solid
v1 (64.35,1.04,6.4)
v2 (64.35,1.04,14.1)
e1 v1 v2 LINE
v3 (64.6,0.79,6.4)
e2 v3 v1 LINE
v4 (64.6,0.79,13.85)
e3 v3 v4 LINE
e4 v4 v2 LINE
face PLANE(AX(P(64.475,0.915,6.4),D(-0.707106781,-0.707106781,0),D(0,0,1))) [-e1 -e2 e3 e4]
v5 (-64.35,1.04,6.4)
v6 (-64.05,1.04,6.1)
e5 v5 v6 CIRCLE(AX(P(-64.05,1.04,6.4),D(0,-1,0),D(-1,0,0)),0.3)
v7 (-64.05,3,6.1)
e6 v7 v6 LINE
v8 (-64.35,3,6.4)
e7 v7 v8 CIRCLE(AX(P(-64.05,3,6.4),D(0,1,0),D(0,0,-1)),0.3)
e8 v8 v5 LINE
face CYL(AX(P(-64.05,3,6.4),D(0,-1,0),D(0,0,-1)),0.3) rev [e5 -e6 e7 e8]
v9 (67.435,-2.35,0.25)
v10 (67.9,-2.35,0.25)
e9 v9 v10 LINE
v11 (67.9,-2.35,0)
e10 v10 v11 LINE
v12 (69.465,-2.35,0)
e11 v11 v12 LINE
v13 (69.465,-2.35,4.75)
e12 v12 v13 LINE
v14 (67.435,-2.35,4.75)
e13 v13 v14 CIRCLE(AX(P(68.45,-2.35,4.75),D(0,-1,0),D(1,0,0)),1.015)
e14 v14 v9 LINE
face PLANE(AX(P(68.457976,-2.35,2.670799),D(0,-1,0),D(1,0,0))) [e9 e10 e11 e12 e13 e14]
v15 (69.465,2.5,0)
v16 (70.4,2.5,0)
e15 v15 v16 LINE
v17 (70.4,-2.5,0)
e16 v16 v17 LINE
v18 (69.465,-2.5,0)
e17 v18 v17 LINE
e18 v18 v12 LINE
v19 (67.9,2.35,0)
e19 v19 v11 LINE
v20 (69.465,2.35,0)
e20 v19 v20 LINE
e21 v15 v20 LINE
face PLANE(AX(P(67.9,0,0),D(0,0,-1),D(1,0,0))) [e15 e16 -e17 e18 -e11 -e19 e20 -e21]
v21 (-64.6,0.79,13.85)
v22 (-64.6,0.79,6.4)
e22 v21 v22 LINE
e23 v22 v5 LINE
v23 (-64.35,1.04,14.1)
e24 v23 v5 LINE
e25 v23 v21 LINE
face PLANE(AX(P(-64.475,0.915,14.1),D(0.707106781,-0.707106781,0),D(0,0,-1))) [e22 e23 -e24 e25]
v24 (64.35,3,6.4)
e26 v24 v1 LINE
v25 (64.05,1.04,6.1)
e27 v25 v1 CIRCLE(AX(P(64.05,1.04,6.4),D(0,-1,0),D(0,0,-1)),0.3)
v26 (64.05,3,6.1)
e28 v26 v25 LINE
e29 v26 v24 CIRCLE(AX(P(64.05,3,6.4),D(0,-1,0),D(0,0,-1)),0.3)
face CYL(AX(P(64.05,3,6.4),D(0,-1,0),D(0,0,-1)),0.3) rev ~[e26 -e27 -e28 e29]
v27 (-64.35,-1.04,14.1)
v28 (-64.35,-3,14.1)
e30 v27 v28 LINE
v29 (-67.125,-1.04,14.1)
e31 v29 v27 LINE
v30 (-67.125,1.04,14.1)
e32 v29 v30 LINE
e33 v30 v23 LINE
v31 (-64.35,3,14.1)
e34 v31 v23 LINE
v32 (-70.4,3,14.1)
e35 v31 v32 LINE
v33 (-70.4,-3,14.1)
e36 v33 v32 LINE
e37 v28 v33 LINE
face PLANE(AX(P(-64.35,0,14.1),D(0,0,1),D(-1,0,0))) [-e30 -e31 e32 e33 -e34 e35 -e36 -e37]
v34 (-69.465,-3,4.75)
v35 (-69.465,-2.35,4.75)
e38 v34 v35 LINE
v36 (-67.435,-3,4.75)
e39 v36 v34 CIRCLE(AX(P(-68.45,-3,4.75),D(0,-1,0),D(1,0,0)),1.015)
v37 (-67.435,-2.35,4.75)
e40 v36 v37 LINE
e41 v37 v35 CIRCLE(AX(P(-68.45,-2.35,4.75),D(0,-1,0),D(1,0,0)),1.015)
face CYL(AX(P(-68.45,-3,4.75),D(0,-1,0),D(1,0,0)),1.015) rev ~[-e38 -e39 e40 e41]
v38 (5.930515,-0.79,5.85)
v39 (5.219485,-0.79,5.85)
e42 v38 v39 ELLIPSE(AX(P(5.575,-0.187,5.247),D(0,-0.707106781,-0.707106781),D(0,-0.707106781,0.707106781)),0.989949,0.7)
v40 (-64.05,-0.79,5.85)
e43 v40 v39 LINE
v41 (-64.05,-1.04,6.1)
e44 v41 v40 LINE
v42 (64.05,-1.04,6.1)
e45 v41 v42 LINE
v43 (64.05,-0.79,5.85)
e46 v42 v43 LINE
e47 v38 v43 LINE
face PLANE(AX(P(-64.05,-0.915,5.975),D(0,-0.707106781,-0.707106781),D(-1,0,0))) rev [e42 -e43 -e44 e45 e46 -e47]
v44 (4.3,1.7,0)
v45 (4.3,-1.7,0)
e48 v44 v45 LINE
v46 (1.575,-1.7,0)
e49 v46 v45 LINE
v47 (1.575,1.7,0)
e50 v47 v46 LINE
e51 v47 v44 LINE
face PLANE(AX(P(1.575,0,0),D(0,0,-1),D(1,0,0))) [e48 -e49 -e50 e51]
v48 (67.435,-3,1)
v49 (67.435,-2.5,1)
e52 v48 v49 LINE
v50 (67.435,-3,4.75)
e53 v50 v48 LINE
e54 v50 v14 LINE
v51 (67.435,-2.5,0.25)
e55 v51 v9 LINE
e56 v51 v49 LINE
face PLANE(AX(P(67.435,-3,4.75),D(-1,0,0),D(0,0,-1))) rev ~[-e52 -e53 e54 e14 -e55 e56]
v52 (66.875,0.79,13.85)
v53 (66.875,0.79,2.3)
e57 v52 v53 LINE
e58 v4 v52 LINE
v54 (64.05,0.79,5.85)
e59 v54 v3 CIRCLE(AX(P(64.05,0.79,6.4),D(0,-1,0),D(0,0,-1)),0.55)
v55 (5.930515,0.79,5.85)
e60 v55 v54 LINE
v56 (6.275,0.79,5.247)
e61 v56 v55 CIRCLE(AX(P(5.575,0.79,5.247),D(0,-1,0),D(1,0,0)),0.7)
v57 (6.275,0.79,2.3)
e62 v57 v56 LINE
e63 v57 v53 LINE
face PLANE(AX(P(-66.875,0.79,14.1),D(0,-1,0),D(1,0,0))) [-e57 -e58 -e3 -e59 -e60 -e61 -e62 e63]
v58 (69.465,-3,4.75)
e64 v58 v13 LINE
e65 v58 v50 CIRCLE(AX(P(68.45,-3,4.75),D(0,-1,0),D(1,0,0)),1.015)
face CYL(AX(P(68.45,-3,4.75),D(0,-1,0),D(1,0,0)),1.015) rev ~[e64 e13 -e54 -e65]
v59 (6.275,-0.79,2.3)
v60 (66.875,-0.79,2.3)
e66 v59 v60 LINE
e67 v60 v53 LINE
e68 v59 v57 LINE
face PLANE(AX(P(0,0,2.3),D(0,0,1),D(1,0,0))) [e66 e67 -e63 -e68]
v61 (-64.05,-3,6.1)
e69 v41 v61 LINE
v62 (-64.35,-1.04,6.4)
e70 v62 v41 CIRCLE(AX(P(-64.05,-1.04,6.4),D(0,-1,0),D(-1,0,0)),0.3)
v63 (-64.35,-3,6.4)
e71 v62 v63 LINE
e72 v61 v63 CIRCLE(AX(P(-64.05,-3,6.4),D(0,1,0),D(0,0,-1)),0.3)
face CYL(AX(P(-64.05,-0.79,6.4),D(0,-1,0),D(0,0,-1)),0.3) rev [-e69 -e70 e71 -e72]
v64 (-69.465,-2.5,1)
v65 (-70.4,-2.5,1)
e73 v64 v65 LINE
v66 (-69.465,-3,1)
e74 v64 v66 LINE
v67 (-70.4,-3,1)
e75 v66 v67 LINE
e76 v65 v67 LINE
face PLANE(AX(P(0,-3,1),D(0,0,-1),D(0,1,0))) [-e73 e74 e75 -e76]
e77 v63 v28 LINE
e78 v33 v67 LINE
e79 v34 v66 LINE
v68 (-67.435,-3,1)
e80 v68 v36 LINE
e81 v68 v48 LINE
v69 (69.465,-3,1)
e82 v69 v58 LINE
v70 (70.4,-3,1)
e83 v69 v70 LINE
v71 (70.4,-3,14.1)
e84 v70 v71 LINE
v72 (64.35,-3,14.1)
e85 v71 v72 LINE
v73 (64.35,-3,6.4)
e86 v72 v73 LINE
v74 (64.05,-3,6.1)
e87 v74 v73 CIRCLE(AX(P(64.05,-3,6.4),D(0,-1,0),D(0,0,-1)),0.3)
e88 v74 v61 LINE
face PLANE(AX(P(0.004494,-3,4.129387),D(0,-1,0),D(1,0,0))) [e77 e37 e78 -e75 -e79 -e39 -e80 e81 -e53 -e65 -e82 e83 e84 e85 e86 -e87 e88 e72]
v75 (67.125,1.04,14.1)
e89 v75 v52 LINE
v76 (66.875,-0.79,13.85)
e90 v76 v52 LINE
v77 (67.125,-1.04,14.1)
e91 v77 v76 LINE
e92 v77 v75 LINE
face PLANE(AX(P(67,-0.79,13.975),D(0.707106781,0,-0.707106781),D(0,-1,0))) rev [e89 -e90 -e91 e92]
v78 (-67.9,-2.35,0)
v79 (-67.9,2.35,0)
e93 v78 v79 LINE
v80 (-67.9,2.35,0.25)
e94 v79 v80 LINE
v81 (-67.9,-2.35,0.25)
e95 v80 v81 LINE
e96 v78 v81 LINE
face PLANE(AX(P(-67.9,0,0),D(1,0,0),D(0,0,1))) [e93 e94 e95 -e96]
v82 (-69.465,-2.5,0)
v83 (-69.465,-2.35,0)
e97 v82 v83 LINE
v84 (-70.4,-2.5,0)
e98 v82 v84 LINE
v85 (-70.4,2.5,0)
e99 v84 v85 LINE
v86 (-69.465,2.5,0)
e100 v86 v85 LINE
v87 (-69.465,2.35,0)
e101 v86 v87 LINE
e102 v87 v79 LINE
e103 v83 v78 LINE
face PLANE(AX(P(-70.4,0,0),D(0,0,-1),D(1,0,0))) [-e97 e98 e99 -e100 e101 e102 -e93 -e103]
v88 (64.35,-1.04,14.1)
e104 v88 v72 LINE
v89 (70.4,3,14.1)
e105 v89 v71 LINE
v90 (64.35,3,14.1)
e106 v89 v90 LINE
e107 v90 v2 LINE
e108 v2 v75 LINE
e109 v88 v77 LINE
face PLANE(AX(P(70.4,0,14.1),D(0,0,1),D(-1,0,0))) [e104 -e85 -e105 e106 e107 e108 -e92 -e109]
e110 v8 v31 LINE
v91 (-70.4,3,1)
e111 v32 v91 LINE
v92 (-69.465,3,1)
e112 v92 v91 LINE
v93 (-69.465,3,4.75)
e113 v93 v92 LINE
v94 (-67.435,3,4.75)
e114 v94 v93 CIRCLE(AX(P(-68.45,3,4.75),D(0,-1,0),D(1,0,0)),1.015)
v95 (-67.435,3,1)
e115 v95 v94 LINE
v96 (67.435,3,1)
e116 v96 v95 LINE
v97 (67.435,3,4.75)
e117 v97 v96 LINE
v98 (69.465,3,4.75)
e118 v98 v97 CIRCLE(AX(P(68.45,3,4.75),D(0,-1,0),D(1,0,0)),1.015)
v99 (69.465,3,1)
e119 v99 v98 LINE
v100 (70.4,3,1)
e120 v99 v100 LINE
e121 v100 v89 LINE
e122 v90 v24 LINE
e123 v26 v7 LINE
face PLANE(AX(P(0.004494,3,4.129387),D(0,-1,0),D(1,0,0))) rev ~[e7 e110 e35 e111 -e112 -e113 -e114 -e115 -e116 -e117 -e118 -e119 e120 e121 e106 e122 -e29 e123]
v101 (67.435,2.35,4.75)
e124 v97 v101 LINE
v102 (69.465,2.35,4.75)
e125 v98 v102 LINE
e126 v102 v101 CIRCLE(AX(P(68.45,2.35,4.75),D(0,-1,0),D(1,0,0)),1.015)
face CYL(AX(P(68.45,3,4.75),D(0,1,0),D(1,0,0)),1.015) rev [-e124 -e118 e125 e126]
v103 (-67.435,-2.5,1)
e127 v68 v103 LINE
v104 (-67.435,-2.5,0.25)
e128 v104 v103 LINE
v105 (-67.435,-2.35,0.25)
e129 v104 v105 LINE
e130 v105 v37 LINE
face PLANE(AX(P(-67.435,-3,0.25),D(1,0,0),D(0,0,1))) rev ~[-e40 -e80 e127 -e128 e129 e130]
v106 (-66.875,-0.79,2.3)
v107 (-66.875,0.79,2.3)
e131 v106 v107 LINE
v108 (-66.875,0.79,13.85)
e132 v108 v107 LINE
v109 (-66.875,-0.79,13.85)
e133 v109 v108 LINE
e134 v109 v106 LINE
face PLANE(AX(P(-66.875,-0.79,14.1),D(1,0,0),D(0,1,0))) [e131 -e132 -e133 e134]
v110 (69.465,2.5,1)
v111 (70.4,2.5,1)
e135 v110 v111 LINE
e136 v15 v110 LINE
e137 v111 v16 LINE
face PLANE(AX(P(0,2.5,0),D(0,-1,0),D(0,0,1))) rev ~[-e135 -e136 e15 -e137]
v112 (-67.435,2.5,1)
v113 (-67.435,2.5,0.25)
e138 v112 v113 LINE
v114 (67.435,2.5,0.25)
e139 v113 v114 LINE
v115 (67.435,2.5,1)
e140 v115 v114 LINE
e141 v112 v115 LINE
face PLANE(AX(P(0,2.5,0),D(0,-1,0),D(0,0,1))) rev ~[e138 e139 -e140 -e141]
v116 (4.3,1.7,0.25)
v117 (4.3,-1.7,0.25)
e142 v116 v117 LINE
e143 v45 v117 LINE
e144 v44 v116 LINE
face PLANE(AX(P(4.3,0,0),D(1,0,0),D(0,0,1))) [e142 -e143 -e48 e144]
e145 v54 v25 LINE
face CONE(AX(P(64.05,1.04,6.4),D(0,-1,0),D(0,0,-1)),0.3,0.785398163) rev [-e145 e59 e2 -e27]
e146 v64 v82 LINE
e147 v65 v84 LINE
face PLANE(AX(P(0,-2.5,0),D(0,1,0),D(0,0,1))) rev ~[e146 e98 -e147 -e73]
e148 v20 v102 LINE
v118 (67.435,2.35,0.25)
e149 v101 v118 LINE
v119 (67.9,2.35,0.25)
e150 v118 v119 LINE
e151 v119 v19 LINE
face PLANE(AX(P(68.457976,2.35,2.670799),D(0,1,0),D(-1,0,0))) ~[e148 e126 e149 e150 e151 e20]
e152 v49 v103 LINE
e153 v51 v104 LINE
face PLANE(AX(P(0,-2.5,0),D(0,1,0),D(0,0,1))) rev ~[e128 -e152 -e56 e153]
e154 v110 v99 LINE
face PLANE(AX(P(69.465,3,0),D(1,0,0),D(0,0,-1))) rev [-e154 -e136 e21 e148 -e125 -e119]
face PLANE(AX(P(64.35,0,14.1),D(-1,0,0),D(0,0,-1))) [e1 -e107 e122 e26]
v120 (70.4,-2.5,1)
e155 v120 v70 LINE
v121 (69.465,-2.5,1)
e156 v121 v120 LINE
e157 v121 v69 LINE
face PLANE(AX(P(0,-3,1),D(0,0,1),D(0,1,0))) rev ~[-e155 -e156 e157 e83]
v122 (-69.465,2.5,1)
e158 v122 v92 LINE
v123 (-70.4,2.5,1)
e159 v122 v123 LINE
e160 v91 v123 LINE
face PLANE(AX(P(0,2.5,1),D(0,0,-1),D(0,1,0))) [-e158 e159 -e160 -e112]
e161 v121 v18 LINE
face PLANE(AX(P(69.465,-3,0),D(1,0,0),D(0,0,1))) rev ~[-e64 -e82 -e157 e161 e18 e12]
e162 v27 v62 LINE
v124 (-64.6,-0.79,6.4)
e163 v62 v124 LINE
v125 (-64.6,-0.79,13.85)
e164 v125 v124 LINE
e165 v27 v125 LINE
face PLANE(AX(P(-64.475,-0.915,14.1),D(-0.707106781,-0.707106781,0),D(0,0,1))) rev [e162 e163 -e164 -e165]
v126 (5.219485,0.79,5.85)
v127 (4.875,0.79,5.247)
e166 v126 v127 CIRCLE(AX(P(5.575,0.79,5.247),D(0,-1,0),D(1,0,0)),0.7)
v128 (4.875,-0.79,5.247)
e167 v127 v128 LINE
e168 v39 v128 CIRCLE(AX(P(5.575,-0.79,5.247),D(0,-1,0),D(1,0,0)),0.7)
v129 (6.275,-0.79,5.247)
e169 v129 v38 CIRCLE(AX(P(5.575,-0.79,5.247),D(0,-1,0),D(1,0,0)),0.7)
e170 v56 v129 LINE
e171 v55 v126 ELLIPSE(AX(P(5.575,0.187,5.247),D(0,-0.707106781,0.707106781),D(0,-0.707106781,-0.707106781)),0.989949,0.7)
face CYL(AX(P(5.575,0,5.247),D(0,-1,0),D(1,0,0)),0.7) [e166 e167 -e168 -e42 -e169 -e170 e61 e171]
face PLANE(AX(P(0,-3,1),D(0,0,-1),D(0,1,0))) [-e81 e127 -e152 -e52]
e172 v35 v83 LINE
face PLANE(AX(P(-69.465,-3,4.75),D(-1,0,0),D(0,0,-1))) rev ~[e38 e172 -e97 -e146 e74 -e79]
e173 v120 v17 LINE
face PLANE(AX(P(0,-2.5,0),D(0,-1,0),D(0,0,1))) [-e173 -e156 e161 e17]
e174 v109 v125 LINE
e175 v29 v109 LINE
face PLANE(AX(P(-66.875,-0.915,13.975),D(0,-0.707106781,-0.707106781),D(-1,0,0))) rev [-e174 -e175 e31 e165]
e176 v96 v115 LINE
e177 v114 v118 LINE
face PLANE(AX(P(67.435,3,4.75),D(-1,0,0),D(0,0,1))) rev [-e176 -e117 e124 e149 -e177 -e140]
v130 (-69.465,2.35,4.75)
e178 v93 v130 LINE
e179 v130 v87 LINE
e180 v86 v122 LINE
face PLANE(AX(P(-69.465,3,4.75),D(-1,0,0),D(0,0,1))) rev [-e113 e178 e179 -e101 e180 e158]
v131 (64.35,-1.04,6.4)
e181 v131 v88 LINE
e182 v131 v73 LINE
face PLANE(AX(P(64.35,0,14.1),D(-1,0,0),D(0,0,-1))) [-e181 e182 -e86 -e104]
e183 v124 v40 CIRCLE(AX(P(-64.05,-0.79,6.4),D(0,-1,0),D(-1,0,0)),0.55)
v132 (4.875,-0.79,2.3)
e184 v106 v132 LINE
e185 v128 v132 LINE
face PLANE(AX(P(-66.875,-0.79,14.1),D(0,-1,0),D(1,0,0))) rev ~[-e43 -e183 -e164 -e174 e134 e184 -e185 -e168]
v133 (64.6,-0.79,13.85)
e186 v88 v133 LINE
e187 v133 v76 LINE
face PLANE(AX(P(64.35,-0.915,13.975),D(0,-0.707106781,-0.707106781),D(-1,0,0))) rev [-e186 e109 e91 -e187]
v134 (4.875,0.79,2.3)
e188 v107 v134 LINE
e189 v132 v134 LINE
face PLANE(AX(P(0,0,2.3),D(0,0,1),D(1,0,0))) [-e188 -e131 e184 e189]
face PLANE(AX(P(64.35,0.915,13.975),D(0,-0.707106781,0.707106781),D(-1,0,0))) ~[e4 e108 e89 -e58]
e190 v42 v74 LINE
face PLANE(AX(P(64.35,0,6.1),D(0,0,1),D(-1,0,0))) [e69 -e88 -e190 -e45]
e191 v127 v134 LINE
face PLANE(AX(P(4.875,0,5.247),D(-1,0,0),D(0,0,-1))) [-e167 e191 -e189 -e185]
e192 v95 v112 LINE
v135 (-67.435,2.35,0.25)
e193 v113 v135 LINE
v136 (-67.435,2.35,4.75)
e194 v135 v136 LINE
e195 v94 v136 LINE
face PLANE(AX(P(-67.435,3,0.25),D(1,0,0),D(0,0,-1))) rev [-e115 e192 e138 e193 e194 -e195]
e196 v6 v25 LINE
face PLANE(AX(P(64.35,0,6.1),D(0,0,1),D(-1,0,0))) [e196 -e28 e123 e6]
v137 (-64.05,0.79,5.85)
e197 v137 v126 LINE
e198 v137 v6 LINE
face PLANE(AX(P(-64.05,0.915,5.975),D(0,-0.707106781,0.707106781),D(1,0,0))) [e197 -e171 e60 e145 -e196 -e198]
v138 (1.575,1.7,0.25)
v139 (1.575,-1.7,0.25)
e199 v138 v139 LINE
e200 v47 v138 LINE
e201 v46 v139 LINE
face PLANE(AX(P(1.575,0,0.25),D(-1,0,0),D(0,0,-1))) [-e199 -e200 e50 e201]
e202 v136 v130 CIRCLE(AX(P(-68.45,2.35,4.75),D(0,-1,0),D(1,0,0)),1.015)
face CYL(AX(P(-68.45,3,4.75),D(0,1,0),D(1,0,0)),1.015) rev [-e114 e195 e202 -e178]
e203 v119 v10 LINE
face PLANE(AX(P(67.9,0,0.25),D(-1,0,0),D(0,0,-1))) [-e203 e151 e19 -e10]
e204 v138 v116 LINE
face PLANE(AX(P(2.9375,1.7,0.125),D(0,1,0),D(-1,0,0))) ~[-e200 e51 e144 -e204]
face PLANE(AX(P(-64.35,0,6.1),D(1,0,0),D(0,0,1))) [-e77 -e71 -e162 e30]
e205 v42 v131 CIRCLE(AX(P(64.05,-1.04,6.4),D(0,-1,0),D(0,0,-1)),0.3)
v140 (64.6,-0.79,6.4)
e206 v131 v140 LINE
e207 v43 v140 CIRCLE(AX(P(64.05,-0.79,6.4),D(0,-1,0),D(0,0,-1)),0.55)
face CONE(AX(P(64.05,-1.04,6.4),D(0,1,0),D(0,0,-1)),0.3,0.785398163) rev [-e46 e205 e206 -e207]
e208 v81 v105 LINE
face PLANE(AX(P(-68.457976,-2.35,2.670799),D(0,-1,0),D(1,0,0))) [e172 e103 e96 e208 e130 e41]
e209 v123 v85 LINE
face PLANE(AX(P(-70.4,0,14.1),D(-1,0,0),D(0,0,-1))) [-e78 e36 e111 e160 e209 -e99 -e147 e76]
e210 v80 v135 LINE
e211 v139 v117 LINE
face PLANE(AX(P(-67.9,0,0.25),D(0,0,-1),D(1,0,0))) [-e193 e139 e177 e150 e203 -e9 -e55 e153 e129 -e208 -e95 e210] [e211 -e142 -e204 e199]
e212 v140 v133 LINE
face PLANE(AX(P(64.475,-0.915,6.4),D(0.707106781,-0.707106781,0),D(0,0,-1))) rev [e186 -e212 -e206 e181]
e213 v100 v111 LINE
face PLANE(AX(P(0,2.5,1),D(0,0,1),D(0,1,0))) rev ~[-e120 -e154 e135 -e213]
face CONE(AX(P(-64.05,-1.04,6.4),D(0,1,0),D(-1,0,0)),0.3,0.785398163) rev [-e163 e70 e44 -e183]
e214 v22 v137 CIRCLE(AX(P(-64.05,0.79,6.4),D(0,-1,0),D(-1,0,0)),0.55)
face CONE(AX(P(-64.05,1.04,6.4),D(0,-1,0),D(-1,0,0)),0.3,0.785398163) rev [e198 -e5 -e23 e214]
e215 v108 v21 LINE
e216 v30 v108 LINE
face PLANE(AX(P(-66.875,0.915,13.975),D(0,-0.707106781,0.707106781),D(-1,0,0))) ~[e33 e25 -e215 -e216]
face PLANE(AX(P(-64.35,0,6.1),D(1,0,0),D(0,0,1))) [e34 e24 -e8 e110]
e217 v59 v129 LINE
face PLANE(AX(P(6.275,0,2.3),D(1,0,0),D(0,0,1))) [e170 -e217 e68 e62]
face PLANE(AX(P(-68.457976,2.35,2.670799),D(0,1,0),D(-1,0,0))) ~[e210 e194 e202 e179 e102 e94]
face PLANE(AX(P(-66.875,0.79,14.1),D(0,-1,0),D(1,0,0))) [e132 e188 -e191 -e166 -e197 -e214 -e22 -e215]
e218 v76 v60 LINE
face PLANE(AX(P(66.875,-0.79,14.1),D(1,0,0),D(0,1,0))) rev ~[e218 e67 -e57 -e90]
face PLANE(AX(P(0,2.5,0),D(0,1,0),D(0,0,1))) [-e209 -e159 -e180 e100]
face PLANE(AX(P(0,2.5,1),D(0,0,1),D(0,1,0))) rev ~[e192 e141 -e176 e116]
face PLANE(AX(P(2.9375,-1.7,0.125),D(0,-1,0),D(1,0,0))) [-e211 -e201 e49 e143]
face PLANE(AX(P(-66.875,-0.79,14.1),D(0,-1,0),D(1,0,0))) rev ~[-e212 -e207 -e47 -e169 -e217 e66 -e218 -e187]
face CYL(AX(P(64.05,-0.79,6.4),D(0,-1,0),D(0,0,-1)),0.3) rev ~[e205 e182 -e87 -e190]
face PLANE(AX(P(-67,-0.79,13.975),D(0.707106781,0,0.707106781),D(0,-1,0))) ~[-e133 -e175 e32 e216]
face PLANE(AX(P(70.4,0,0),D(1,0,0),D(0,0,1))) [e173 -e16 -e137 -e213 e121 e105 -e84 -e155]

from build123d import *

# Parameters (mm, degrees)
F13_DEPTH     = 3
F0_DEPTH      = 0.65
F2_W          = 2.725
F2_H          = 0.25
F3_DEPTH      = 1.3
F4_W          = 0.5
F4_H          = 1
F5_DEPTH      = 70.401
F5_DEPTH_BACK = 70.401
F6_W          = 133.75
F6_H          = 1.58
F7_DEPTH      = 11.8
F8_R          = 0.3
F9_SIZE       = 0.25
F11_DEPTH     = 1


# Not quite as in the source:
# - a pattern or mirror of a feature is missing from the dataset's text; its kind, count and spacing are read off the source's solid


with BuildPart() as f13:
    # F12 (on Front) → F13 (new body, symmetric)
    with BuildSketch(Plane.XZ):
        Polygon((-67.9, 0), (-67.9, 0.25), (1.575, 0.25), (1.575, 0), (4.3, 0), (4.3, 0.25), (67.9, 0.25), (67.9, 0), (70.4, 0), (70.4, 14.1), (64.35, 14.1), (64.35, 6.1), (-64.35, 6.1), (-64.35, 14.1), (-70.4, 14.1), (-70.4, 0), align=None)
    extrude(amount=F13_DEPTH, both=True)

    # F15: F0, F0b across plane


with BuildPart() as f0:
    # F14 (on face) → F0 (new body)
    with BuildSketch(Plane.XZ.offset(3)):
        with BuildLine():
            Line((-69.465, 4.75), (-69.465, 0))
            Line((-69.465, 0), (-67.9, 0))
            Line((-67.9, 0), (-67.9, 0.25))
            Line((-67.9, 0.25), (-67.435, 0.25))
            Line((-67.435, 0.25), (-67.435, 4.75))
            ThreePointArc((-67.435, 4.75), (-68.45, 5.765), (-69.465, 4.75))
        make_face()
    extrude(amount=-F0_DEPTH)


with BuildPart() as f0b:
    # F14 (on face) → F0, piece 2 (new body)
    with BuildSketch(Plane.XZ.offset(3)):
        with BuildLine():
            Line((67.9, 0.25), (67.9, 0))
            Line((67.9, 0), (69.465, 0))
            Line((69.465, 0), (69.465, 4.75))
            ThreePointArc((69.465, 4.75), (68.45, 5.765), (67.435, 4.75))
            Line((67.435, 4.75), (67.435, 0.25))
            Line((67.435, 0.25), (67.9, 0.25))
        make_face()
    extrude(amount=-F0_DEPTH)


with BuildPart() as f13_1:
    add(f13.part)
    add(f0.part.mirror(Plane.XZ), mode=Mode.SUBTRACT)
    add(f0b.part.mirror(Plane.XZ), mode=Mode.SUBTRACT)

    # F1: cut F0, F0b
    add(f0.part, mode=Mode.SUBTRACT)
    add(f0b.part, mode=Mode.SUBTRACT)

    # F2 (on face) → F3 (cut)
    with BuildSketch(Plane.XZ.offset(3)):
        with Locations((2.9375, 0.125)):
            Rectangle(F2_W, F2_H)
    f3 = extrude(amount=-F3_DEPTH, mode=Mode.SUBTRACT)

    # F3_copies: F3 across plane
    add(f3.mirror(Plane.ZX), mode=Mode.SUBTRACT)

    # F4 (on Right) → F5 (cut, two sides)
    with BuildSketch(Plane.YZ) as f5_sk:
        with Locations((-2.75, 0.5)):
            Rectangle(F4_W, F4_H)
        with Locations((2.75, 0.5)):
            Rectangle(F4_W, F4_H)
    extrude(amount=-F5_DEPTH, mode=Mode.SUBTRACT)
    extrude(f5_sk.sketch, amount=F5_DEPTH_BACK, mode=Mode.SUBTRACT)

    # F6 (on face) → F7 (cut)
    with BuildSketch(Plane.XY.offset(14.1)):
        Rectangle(F6_W, F6_H)
    extrude(amount=-F7_DEPTH, mode=Mode.SUBTRACT)

    # F8
    f8_edges = [f13_1.edges().sort_by_distance(p)[0] for p in [
        (-64.35, 1.895, 6.1),
        (-64.35, -1.895, 6.1),
        (64.35, 1.895, 6.1),
        (64.35, -1.895, 6.1),
    ]]
    fillet(f8_edges, radius=F8_R)

    # F9
    f9_edges = [f13_1.edges().sort_by_distance(p)[0] for p in [
        (-65.6125, 0.79, 14.1),
        (-66.875, 0, 14.1),
        (-65.6125, -0.79, 14.1),
        (-64.35, 0.79, 10.25),
        (-64.35, -0.79, 10.25),
        (65.6125, 0.79, 14.1),
        (66.875, 0, 14.1),
        (65.6125, -0.79, 14.1),
        (-64.262132, -0.79, 6.187868),
        (0, -0.79, 6.1),
        (64.262132, -0.79, 6.187868),
        (64.35, -0.79, 10.25),
        (64.35, 0.79, 10.25),
        (64.262132, 0.79, 6.187868),
        (0, 0.79, 6.1),
        (-64.262132, 0.79, 6.187868),
    ]]
    chamfer(f9_edges, length=F9_SIZE)

    # F10 (on Front) → F11 (join, symmetric)
    with BuildSketch(Plane.XZ):
        with BuildLine():
            Line((6.275, 2.3), (6.275, 5.247))
            ThreePointArc((6.275, 5.247), (5.575, 5.947), (4.875, 5.247))
            Line((4.875, 5.247), (4.875, 2.3))
            Line((4.875, 2.3), (6.275, 2.3))
        make_face()
    extrude(amount=F11_DEPTH, both=True)


solid = f13_1.part
